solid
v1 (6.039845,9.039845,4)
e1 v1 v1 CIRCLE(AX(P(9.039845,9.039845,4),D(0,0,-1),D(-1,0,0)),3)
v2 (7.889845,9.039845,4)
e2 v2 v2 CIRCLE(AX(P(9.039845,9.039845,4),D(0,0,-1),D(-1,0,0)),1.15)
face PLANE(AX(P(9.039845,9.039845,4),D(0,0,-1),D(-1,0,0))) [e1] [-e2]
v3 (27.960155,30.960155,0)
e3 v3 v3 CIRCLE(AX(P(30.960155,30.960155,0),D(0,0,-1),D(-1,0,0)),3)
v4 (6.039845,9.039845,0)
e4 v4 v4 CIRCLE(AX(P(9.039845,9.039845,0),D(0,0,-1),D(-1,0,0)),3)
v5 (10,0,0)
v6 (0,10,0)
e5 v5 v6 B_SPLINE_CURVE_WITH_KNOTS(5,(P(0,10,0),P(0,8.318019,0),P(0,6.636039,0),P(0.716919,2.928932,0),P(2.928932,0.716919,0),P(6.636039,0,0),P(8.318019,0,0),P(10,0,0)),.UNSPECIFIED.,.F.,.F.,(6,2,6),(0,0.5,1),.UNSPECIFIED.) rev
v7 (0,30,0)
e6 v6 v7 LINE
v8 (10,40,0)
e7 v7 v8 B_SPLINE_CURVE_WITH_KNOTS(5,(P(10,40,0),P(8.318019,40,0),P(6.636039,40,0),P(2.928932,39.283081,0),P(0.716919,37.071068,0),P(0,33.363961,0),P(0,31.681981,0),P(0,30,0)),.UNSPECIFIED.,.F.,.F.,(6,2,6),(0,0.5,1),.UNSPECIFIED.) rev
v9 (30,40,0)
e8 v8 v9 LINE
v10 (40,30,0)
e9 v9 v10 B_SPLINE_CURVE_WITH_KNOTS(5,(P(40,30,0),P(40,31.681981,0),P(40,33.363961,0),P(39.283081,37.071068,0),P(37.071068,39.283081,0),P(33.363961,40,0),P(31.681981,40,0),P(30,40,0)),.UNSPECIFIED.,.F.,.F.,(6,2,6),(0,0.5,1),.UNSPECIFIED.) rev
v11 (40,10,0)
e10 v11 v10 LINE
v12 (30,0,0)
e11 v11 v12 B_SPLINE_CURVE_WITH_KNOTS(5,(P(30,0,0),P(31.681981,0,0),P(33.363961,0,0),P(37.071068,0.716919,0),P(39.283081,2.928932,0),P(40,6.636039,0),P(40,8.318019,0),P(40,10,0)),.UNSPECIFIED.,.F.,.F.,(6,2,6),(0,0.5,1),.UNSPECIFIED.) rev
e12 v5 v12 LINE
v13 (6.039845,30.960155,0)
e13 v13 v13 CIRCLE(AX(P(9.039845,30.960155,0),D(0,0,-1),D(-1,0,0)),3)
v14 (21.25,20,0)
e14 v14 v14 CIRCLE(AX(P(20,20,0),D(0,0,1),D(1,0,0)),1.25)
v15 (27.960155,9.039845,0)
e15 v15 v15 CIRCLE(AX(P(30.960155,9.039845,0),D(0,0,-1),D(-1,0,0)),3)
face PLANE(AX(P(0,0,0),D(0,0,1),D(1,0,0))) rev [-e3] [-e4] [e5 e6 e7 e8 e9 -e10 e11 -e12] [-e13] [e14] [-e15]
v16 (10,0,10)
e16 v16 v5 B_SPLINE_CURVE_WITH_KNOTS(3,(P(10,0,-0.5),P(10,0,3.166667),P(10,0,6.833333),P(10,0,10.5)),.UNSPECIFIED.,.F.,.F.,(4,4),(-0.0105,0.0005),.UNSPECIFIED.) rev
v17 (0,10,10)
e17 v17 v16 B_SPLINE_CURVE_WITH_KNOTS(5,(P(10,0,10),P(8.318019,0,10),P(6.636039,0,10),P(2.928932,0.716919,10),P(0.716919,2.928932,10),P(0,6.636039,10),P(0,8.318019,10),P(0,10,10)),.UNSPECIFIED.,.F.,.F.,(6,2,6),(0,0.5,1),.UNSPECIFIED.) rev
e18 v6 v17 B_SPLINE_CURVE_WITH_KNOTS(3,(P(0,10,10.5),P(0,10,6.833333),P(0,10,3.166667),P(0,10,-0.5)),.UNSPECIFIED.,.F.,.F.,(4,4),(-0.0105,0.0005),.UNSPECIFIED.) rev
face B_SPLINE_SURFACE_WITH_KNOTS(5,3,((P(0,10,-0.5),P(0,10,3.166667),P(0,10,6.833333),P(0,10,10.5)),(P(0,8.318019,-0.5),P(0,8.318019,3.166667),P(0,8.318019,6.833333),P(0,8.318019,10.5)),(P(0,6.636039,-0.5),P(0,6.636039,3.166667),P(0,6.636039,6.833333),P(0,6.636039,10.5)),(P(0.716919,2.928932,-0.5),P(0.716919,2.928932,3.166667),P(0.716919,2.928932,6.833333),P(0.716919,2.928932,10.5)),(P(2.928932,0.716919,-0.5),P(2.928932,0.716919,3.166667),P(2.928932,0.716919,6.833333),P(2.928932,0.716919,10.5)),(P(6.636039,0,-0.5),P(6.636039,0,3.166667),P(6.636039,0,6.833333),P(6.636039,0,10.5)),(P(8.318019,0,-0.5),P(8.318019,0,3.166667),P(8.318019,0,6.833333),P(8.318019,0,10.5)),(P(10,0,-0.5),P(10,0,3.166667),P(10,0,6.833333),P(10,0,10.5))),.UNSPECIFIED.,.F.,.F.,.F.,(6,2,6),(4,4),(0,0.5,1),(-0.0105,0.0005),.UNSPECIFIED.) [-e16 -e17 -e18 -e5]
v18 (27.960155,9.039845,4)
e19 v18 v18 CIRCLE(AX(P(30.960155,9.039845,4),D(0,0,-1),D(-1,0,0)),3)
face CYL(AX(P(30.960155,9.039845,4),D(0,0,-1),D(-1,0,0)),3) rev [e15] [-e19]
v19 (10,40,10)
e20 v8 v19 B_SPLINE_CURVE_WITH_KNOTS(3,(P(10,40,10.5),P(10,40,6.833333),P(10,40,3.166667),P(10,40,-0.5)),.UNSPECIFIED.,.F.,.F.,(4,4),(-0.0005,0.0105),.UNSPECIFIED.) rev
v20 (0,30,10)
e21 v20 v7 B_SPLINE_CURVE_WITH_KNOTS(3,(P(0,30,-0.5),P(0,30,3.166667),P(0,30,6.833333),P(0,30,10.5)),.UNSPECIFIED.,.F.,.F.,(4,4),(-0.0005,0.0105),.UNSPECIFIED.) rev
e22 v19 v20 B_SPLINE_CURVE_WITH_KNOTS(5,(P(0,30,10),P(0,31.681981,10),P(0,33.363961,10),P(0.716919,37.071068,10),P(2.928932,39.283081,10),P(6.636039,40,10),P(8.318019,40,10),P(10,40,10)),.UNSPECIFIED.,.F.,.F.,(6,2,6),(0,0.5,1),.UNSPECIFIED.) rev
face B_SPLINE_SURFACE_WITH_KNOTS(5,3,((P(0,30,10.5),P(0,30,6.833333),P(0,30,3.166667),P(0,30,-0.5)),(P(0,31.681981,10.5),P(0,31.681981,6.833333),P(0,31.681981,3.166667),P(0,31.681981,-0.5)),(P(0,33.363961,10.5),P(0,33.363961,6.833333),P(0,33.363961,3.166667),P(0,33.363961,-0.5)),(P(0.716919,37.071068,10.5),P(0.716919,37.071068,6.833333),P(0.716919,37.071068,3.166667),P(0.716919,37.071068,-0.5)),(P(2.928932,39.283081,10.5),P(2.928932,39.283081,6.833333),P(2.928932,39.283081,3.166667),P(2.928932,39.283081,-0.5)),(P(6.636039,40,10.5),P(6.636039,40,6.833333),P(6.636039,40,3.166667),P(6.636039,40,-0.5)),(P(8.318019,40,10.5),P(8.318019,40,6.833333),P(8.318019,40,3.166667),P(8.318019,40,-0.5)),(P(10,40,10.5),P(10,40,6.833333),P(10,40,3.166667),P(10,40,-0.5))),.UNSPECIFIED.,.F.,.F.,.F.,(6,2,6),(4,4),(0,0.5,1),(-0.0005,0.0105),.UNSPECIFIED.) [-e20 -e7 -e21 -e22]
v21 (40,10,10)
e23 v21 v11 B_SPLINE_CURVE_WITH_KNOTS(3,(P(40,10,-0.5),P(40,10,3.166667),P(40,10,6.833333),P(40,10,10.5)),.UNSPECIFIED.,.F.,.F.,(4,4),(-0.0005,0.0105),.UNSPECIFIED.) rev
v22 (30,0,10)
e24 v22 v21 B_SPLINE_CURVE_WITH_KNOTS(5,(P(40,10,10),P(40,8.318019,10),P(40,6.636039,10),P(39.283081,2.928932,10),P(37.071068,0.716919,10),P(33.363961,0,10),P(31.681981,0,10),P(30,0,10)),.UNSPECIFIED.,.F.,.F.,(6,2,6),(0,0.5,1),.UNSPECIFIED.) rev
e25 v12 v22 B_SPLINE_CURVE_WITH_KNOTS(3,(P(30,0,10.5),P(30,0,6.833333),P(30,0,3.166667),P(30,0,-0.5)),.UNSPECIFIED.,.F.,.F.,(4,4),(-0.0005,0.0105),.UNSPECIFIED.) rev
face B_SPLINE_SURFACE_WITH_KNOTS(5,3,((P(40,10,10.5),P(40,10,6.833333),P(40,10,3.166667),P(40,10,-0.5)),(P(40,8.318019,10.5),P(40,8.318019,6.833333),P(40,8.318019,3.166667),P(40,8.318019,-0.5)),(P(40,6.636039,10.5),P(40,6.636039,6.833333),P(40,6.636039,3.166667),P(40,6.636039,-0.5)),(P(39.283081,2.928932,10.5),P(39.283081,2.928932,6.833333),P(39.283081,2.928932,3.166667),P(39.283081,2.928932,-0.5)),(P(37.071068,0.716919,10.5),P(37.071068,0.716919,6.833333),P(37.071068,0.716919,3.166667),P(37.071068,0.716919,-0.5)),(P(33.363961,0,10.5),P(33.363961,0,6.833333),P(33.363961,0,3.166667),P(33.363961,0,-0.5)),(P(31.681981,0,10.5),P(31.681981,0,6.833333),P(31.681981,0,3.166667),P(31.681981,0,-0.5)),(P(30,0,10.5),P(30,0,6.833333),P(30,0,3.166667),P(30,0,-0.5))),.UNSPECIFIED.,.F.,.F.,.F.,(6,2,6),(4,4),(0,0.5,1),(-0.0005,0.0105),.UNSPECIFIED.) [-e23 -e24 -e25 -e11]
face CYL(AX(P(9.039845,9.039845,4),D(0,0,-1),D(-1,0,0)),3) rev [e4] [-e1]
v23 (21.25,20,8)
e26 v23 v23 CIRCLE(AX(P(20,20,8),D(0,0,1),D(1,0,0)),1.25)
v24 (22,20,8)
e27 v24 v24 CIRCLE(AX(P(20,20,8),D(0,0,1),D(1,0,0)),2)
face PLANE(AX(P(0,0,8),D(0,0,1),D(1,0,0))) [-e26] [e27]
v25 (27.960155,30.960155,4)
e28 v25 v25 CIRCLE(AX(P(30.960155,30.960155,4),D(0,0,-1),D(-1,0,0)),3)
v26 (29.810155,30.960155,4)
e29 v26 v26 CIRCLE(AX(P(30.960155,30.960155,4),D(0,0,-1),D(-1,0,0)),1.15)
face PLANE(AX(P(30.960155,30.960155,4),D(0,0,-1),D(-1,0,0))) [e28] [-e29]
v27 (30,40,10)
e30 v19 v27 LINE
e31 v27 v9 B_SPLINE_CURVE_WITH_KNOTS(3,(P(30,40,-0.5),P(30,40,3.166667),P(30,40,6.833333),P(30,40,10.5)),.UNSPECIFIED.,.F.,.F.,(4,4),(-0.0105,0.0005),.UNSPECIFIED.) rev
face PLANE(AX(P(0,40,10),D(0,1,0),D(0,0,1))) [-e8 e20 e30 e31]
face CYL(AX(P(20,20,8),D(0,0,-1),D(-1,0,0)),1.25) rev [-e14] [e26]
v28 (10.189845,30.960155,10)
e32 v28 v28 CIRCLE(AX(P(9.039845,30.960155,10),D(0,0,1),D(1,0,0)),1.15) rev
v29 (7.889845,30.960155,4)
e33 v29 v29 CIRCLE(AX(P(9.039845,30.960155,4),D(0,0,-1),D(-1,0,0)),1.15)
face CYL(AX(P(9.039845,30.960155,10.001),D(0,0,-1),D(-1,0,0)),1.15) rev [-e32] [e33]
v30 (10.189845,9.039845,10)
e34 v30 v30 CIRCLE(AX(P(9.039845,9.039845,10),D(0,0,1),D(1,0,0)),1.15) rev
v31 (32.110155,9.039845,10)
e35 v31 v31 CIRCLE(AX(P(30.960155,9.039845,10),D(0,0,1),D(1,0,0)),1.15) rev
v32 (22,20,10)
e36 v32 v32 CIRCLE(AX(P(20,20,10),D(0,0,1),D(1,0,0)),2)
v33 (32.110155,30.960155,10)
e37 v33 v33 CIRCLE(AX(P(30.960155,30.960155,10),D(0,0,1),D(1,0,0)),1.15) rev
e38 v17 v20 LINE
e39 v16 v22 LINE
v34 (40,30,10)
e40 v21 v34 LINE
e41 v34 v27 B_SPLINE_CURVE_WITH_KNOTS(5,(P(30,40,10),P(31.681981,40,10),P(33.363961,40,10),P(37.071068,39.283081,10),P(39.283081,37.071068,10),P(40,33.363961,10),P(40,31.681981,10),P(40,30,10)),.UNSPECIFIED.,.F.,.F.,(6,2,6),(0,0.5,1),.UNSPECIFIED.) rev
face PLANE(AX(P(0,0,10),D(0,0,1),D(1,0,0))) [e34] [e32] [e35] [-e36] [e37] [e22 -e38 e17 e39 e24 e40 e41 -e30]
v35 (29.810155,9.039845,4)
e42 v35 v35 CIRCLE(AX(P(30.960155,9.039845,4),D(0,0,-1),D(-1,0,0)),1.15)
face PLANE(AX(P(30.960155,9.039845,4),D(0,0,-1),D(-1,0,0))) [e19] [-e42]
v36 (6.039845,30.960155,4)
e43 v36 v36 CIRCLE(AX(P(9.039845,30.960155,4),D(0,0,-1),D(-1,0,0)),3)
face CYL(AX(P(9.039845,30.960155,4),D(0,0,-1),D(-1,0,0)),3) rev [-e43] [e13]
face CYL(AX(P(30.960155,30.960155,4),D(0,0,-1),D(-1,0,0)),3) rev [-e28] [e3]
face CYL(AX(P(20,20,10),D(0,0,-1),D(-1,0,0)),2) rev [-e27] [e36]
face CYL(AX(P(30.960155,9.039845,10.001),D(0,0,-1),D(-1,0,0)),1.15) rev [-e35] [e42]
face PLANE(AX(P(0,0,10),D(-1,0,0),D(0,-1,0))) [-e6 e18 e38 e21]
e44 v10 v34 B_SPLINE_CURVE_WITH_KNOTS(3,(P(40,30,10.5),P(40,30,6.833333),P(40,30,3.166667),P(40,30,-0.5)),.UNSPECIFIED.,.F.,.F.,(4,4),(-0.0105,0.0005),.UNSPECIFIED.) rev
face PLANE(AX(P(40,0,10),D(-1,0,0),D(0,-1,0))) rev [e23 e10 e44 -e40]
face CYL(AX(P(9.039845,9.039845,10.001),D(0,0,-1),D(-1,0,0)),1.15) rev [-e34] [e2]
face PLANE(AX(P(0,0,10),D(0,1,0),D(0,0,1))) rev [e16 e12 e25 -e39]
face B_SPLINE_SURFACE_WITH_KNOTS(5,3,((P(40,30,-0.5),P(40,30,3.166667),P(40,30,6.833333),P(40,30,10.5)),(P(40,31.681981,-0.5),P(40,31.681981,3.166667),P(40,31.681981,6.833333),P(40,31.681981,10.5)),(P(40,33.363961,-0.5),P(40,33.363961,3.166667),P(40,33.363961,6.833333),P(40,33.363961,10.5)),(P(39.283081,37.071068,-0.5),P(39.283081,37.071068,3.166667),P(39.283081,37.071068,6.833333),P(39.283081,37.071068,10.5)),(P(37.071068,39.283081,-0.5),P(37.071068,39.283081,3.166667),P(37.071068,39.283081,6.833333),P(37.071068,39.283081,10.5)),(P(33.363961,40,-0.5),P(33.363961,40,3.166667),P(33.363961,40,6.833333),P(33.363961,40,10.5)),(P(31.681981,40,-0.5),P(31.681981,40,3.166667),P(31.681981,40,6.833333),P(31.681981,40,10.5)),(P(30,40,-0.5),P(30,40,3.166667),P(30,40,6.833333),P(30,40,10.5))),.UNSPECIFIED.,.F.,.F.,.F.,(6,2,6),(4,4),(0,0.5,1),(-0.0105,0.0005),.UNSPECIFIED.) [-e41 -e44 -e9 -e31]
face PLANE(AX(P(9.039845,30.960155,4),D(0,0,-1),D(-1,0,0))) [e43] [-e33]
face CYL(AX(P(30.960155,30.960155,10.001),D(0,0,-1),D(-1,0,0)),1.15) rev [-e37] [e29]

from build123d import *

# Parameters (mm, degrees)
ESQUISSE1_W             = 40
ESQUISSE1_H             = 40
ESQUISSE1_R             = 2
BOSS_EXTRU_1_DEPTH      = 10
ESQUISSE1_3_R           = 2
ESQUISSE1_3_R_2         = 1.25
BOSS_EXTRU_2_DEPTH      = 8
ENL_V_MAT_EXTRU_1_REACH = 59.446
ESQUISSE2_R             = 1.15
ESQUISSE2_5_R           = 3
ESQUISSE2_5_R_2         = 1.15
ENL_V_MAT_EXTRU_2_DEPTH = 4
CONG_1_SIZE             = 10


with BuildPart() as part:
    # Esquisse1 → Boss.-Extru.1 (new body)
    with BuildSketch(Plane.XY):
        with Locations((20, 20)):
            Rectangle(ESQUISSE1_W, ESQUISSE1_H)
        with Locations((20, 20)):
            Circle(ESQUISSE1_R, mode=Mode.SUBTRACT)
    extrude(amount=BOSS_EXTRU_1_DEPTH)

    # Esquisse1<3> → Boss.-Extru.2 (add)
    with BuildSketch(Plane.XY):
        with Locations((20, 20)):
            Circle(ESQUISSE1_3_R)
        with Locations((20, 20)):
            Circle(ESQUISSE1_3_R_2, mode=Mode.SUBTRACT)
    extrude(amount=BOSS_EXTRU_2_DEPTH)

    # Esquisse2 → Enlèv. mat.-Extru.1 (cut, up to next)
    with BuildSketch(Plane(origin=(0, 0, 0), x_dir=(-1, 0, 0), z_dir=(0, 0, -1)), mode=Mode.PRIVATE) as enl_v_mat_extru_1_sk1:
        with Locations((-9.039844892, 30.960155108)):
            Circle(ESQUISSE2_R)
    enl_v_mat_extru_1_tool1 = extrude(enl_v_mat_extru_1_sk1.sketch, amount=-ENL_V_MAT_EXTRU_1_REACH, mode=Mode.PRIVATE) & part.part
    # Esquisse2 → Enlèv. mat.-Extru.1 (cut, up to next)
    with BuildSketch(Plane(origin=(0, 0, 0), x_dir=(-1, 0, 0), z_dir=(0, 0, -1)), mode=Mode.PRIVATE) as enl_v_mat_extru_1_sk2:
        with Locations((-9.039844892, 9.039844892)):
            Circle(ESQUISSE2_R)
    enl_v_mat_extru_1_tool2 = extrude(enl_v_mat_extru_1_sk2.sketch, amount=-ENL_V_MAT_EXTRU_1_REACH, mode=Mode.PRIVATE) & part.part
    # Esquisse2 → Enlèv. mat.-Extru.1 (cut, up to next)
    with BuildSketch(Plane(origin=(0, 0, 0), x_dir=(-1, 0, 0), z_dir=(0, 0, -1)), mode=Mode.PRIVATE) as enl_v_mat_extru_1_sk3:
        with Locations((-30.960155108, 9.039844892)):
            Circle(ESQUISSE2_R)
    enl_v_mat_extru_1_tool3 = extrude(enl_v_mat_extru_1_sk3.sketch, amount=-ENL_V_MAT_EXTRU_1_REACH, mode=Mode.PRIVATE) & part.part
    # Esquisse2 → Enlèv. mat.-Extru.1 (cut, up to next)
    with BuildSketch(Plane(origin=(0, 0, 0), x_dir=(-1, 0, 0), z_dir=(0, 0, -1)), mode=Mode.PRIVATE) as enl_v_mat_extru_1_sk4:
        with Locations((-30.960155108, 30.960155108)):
            Circle(ESQUISSE2_R)
    enl_v_mat_extru_1_tool4 = extrude(enl_v_mat_extru_1_sk4.sketch, amount=-ENL_V_MAT_EXTRU_1_REACH, mode=Mode.PRIVATE) & part.part
    add(enl_v_mat_extru_1_tool1.solids().sort_by_distance((9.039845, 30.960155, 0))[0], mode=Mode.SUBTRACT)
    add(enl_v_mat_extru_1_tool2.solids().sort_by_distance((9.039845, 9.039845, 0))[0], mode=Mode.SUBTRACT)
    add(enl_v_mat_extru_1_tool3.solids().sort_by_distance((30.960155, 9.039845, 0))[0], mode=Mode.SUBTRACT)
    add(enl_v_mat_extru_1_tool4.solids().sort_by_distance((30.960155, 30.960155, 0))[0], mode=Mode.SUBTRACT)

    # Esquisse2<5> → Enlèv. mat.-Extru.2 (cut)
    # profile 1 of 4: a face of its own
    with BuildSketch(Plane(origin=(0, 0, 0), x_dir=(-1, 0, 0), z_dir=(0, 0, -1))):
        with Locations((-9.039844892, 30.960155108)):
            Circle(ESQUISSE2_5_R)
        with Locations((-9.039844892, 30.960155108)):
            Circle(ESQUISSE2_5_R_2, mode=Mode.SUBTRACT)
    # profile 2 of 4: a face of its own
    with BuildSketch(Plane(origin=(0, 0, 0), x_dir=(-1, 0, 0), z_dir=(0, 0, -1))):
        with Locations((-9.039844892, 9.039844892)):
            Circle(ESQUISSE2_5_R)
        with Locations((-9.039844892, 9.039844892)):
            Circle(ESQUISSE2_5_R_2, mode=Mode.SUBTRACT)
    # profile 3 of 4: a face of its own
    with BuildSketch(Plane(origin=(0, 0, 0), x_dir=(-1, 0, 0), z_dir=(0, 0, -1))):
        with Locations((-30.960155108, 9.039844892)):
            Circle(ESQUISSE2_5_R)
        with Locations((-30.960155108, 9.039844892)):
            Circle(ESQUISSE2_5_R_2, mode=Mode.SUBTRACT)
    # profile 4 of 4: a face of its own
    with BuildSketch(Plane(origin=(0, 0, 0), x_dir=(-1, 0, 0), z_dir=(0, 0, -1))):
        with Locations((-30.960155108, 30.960155108)):
            Circle(ESQUISSE2_5_R)
        with Locations((-30.960155108, 30.960155108)):
            Circle(ESQUISSE2_5_R_2, mode=Mode.SUBTRACT)
    extrude(amount=-ENL_V_MAT_EXTRU_2_DEPTH, mode=Mode.SUBTRACT)

    # Congé1
    # a fillet whose section is not a circle: 10 mm, written as the material it takes off along each edge
    with BuildSketch(Plane(origin=(0, 0, -25), x_dir=(1, 0, 0), z_dir=(0, 0, 1)), Plane(origin=(0, 40, -25), x_dir=(0, -1, 0), z_dir=(0, 0, 1))) as cong_1_piece_1:
        with BuildLine():
            add(Edge.make_bspline([(CONG_1_SIZE, 0), (CONG_1_SIZE * 0.831801948466, 0), (CONG_1_SIZE * 0.663603896932, 0), (CONG_1_SIZE * 0.292893218813, CONG_1_SIZE * 0.0716919198361), (CONG_1_SIZE * 0.0716919198361, CONG_1_SIZE * 0.292893218813), (0, CONG_1_SIZE * 0.663603896932), (0, CONG_1_SIZE * 0.831801948466), (0, CONG_1_SIZE)], knots=[0, 0, 0, 0, 0, 0, 0.5, 0.5, 1, 1, 1, 1, 1, 1], degree=5))
            Line((0, CONG_1_SIZE), (0, 0))
            Line((0, 0), (CONG_1_SIZE, 0))
        make_face()
    extrude(amount=60, mode=Mode.SUBTRACT)
    with BuildSketch(Plane(origin=(40, 40, -25), x_dir=(0, -1, 0), z_dir=(0, 0, 1)), Plane(origin=(40, 0, -25), x_dir=(-1, 0, 0), z_dir=(0, 0, 1))) as cong_1_piece_2:
        with BuildLine():
            add(Edge.make_bspline([(CONG_1_SIZE, 0), (CONG_1_SIZE * 0.831801948466, 0), (CONG_1_SIZE * 0.663603896932, 0), (CONG_1_SIZE * 0.292893218813, -CONG_1_SIZE * 0.0716919198361), (CONG_1_SIZE * 0.0716919198361, -CONG_1_SIZE * 0.292893218813), (0, -CONG_1_SIZE * 0.663603896932), (0, -CONG_1_SIZE * 0.831801948466), (0, -CONG_1_SIZE)], knots=[0, 0, 0, 0, 0, 0, 0.5, 0.5, 1, 1, 1, 1, 1, 1], degree=5))
            Line((0, -CONG_1_SIZE), (0, 0))
            Line((0, 0), (CONG_1_SIZE, 0))
        make_face()
    extrude(amount=60, mode=Mode.SUBTRACT)


solid = part.part
